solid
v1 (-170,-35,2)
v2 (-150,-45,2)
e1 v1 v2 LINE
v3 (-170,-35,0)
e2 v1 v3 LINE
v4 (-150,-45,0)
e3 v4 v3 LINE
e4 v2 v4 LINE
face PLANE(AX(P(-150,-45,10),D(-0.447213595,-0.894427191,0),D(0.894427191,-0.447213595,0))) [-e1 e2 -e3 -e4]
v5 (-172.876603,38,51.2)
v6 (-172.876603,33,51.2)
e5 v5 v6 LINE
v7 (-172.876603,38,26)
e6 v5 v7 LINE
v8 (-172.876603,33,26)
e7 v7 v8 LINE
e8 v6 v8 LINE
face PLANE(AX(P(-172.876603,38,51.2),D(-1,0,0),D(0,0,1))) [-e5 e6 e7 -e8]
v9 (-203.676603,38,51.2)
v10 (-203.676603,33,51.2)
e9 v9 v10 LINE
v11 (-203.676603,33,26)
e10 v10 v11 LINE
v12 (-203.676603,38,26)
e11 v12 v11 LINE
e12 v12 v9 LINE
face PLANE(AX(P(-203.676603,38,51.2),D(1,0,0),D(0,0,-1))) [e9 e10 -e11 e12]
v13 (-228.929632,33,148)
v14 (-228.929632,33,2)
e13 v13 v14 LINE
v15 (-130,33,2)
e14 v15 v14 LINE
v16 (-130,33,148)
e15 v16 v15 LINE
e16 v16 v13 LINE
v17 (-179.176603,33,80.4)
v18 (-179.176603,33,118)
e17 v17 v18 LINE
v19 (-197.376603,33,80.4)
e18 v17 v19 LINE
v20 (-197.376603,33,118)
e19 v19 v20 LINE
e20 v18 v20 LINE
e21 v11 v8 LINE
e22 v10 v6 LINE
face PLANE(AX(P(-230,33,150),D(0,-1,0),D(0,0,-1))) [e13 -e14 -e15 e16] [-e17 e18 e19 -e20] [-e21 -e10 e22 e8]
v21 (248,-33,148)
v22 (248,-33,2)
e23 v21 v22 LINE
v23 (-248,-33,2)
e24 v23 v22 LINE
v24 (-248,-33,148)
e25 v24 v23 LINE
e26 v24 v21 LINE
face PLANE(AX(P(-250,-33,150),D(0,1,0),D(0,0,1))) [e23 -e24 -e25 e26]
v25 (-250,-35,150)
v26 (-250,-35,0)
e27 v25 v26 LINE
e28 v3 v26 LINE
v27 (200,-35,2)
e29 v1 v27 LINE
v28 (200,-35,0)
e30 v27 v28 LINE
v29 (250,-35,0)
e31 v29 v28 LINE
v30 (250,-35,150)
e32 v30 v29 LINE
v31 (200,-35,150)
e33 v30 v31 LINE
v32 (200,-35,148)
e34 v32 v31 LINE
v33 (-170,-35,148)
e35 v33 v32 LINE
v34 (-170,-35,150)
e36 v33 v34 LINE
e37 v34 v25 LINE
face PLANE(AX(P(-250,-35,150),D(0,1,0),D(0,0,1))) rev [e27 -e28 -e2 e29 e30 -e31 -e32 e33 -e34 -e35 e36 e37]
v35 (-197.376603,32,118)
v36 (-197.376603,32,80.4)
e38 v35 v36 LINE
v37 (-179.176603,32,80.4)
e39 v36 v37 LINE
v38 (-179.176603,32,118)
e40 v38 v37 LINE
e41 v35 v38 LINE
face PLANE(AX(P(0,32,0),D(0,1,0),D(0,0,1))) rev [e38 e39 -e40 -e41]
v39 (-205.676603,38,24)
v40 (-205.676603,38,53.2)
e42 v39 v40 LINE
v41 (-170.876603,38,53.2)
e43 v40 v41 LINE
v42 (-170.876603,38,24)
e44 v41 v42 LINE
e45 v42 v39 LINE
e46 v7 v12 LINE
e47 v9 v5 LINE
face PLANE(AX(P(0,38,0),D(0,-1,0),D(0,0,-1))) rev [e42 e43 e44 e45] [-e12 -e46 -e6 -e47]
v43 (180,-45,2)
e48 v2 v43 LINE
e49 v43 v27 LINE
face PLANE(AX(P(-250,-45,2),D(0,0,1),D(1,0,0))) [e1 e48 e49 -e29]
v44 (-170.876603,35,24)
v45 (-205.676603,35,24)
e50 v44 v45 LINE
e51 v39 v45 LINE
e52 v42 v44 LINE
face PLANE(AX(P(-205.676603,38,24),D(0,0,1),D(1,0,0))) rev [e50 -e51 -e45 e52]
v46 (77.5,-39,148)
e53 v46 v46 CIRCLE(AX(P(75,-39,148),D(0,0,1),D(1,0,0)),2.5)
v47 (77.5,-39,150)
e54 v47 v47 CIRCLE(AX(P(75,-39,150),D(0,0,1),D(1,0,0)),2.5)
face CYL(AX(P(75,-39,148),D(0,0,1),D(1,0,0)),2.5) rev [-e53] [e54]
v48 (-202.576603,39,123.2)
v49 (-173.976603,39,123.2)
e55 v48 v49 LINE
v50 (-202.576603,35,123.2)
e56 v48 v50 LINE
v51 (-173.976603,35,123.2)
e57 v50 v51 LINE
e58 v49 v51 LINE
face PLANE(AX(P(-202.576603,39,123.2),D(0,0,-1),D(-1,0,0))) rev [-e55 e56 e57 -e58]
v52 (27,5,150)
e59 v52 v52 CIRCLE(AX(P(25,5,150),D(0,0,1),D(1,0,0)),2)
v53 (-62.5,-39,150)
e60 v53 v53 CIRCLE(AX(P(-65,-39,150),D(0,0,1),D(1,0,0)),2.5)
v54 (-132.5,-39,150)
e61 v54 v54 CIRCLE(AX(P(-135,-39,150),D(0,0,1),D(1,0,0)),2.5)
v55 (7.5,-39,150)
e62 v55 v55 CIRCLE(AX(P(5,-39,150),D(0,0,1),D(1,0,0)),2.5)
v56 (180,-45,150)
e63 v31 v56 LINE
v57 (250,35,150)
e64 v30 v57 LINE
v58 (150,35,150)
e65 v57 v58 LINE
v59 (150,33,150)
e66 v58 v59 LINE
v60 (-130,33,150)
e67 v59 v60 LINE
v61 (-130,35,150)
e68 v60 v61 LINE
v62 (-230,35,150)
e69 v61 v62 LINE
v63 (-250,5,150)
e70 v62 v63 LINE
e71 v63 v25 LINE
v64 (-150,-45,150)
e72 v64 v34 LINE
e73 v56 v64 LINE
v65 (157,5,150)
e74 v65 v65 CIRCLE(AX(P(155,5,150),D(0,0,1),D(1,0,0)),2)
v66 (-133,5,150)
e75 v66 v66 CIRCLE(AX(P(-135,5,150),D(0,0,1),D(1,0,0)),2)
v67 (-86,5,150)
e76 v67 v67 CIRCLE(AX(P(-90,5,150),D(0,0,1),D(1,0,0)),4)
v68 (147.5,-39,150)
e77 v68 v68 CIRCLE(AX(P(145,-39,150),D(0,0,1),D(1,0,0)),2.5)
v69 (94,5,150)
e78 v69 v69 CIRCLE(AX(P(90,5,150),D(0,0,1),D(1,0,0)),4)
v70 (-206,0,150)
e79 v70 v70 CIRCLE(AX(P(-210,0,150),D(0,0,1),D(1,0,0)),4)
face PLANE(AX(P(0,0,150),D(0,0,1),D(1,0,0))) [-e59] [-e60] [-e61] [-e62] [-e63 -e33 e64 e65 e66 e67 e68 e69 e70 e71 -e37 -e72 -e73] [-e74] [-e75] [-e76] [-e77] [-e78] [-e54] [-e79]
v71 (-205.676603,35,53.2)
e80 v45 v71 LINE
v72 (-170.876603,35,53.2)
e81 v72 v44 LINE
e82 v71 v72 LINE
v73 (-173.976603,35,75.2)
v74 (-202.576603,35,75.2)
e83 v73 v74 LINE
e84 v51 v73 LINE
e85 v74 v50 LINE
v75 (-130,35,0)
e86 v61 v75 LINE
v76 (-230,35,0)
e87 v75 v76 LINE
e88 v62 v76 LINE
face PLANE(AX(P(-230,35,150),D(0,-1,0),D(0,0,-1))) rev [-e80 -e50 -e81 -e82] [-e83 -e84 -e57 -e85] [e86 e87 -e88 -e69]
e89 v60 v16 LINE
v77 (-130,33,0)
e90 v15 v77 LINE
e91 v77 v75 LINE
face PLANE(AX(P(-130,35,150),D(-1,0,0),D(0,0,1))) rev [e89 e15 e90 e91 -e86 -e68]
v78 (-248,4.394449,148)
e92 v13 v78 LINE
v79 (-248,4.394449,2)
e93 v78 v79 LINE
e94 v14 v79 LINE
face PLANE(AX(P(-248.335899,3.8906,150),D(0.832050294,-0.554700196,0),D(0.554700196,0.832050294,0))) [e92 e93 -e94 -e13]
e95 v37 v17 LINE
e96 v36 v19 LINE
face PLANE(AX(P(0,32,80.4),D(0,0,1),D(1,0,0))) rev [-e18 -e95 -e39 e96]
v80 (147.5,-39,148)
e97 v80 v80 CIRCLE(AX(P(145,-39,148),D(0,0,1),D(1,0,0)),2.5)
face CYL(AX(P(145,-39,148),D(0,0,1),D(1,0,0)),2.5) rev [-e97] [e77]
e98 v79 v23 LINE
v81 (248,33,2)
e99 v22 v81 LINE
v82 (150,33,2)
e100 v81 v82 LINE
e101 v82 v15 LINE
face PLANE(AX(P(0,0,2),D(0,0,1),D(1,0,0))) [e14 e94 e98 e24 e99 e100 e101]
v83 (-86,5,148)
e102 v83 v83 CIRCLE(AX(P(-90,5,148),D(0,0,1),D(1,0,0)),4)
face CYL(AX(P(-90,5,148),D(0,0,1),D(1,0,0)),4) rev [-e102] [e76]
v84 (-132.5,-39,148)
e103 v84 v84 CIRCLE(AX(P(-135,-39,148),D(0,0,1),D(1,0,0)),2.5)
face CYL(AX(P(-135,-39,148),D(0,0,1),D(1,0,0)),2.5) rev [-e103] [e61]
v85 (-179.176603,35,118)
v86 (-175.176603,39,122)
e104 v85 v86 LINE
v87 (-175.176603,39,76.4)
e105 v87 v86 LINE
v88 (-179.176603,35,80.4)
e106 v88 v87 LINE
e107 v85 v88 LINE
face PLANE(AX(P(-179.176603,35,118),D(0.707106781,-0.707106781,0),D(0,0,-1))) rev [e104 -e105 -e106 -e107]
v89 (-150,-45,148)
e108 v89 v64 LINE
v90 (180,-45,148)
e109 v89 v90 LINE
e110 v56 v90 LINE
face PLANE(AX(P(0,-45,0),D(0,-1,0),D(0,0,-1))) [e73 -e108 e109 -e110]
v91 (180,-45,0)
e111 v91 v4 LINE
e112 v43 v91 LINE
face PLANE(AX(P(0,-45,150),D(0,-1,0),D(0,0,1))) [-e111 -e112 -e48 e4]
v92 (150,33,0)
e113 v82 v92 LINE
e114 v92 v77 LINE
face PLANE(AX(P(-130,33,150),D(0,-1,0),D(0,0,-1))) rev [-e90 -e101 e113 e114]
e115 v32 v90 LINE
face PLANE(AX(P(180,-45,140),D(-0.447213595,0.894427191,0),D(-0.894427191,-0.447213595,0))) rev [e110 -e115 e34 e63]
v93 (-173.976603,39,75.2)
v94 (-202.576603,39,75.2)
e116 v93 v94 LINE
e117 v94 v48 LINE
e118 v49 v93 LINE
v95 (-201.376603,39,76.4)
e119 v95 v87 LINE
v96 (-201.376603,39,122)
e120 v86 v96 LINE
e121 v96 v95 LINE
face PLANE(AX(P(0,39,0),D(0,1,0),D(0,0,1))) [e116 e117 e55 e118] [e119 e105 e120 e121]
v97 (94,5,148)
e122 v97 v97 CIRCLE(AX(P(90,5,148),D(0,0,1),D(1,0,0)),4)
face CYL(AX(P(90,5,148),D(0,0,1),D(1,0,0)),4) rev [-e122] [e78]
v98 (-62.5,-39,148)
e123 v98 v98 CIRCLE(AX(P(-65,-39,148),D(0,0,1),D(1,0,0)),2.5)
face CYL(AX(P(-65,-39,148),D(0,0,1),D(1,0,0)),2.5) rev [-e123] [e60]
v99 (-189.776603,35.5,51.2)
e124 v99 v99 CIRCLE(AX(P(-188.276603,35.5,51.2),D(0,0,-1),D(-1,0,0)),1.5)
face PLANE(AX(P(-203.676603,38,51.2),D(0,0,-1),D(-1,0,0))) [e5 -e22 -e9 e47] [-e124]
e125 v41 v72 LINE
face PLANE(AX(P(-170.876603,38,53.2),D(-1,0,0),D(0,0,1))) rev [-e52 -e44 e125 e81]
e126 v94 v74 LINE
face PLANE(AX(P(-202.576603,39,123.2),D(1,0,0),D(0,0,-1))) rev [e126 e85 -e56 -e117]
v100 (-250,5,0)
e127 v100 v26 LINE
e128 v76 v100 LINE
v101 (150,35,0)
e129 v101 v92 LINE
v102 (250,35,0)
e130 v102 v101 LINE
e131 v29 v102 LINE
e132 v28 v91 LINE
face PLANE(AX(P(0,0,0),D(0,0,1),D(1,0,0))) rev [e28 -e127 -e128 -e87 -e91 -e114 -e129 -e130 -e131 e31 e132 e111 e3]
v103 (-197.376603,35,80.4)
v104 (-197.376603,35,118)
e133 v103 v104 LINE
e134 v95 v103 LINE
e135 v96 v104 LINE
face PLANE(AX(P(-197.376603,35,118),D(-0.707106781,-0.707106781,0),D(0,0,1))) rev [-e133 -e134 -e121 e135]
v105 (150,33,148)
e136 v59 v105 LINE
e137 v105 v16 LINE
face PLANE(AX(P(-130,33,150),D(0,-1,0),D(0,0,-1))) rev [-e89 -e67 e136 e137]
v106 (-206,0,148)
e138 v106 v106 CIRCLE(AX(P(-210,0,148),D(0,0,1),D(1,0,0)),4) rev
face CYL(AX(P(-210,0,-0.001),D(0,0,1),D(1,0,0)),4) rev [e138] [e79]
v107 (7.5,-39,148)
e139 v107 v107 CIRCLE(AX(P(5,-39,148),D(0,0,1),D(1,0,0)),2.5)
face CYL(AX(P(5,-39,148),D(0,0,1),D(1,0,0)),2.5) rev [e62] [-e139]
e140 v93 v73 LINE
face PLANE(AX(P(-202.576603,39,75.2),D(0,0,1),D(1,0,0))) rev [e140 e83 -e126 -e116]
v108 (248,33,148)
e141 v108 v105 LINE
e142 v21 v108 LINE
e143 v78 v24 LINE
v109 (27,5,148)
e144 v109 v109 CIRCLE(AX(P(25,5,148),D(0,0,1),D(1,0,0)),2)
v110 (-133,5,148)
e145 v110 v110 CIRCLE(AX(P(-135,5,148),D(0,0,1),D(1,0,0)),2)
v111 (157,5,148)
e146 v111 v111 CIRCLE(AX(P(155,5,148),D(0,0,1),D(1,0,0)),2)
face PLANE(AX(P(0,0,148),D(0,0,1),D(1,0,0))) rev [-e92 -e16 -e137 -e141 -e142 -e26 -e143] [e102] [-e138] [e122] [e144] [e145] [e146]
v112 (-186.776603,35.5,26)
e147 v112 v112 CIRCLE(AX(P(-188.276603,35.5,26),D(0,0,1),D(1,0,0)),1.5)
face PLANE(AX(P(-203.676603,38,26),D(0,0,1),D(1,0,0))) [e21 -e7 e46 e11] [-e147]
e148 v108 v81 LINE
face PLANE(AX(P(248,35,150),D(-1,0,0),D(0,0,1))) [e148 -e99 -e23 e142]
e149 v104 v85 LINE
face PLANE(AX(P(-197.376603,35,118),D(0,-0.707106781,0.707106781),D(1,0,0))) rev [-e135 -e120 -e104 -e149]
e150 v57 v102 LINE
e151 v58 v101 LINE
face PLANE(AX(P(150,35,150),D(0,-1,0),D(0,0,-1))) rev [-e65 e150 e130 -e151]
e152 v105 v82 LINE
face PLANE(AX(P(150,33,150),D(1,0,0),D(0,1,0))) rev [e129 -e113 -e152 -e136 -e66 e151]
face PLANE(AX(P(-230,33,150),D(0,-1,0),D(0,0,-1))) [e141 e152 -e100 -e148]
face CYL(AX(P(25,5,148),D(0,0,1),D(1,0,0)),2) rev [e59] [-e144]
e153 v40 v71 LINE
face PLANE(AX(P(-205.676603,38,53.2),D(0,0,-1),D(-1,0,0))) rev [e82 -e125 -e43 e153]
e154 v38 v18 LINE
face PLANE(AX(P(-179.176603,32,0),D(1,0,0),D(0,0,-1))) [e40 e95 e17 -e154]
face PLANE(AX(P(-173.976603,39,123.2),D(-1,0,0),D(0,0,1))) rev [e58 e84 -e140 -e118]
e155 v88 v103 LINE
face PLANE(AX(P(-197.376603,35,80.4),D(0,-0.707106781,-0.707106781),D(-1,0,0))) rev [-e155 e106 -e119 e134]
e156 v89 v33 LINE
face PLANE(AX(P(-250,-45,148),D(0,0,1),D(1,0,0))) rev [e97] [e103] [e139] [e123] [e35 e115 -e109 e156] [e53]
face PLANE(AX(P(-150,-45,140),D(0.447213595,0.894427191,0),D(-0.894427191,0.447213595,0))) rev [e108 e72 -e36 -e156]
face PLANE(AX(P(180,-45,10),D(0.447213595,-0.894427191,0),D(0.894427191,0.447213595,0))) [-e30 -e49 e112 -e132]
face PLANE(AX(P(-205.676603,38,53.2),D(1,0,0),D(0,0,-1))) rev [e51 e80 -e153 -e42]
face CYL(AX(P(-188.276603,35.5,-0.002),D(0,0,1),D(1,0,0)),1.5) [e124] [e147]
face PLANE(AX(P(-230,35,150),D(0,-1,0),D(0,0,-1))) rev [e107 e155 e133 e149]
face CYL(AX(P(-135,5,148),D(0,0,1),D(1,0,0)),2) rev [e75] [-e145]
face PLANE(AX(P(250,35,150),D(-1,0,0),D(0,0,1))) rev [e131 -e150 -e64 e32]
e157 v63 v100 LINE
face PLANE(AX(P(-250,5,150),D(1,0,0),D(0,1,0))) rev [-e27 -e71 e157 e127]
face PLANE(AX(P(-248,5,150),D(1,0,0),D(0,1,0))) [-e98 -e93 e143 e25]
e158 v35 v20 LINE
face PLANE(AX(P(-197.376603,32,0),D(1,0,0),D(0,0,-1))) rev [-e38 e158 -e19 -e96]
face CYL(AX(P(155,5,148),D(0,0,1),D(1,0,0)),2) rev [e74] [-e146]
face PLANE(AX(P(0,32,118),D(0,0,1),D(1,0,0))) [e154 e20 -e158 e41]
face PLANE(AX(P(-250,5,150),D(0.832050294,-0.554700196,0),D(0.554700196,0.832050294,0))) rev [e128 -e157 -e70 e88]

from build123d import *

# Parameters (mm, degrees)
EXTRUDE_1_DEPTH        = 150
SHELL_START            = 2
SHELL_1_DEPTH          = 146
SKETCH_3_W             = 500
SKETCH_3_H             = 2
EXTRUDE_2_DEPTH        = 10
CUT_EXTRUDE_1_DEPTH    = 10
SKETCH_5_R             = 2.5
CUT_EXTRUDE_2_DEPTH    = 2
PATTERN_LINEAR_1_COUNT = 5
PATTERN_LINEAR_1_PITCH = 70
SKETCH_6_R             = 2
CUT_EXTRUDE_3_DEPTH    = 2
SKETCH_7_R             = 4
CUT_EXTRUDE_4_DEPTH    = 2
CUT_EXTRUDE_5_REACH    = 297
SKETCH_8_R             = 4
SKETCH_9_W             = 28.6
SKETCH_9_H             = 48
SKETCH_9_W_2           = 18.2
SKETCH_9_H_2           = 37.6
EXTRUDE_3_DEPTH        = 4
CHAMFER_1_SIZE         = 4
SKETCH_11_W            = 34.8
SKETCH_11_H            = 29.2
SKETCH_11_W_2          = 30.8
SKETCH_11_H_2          = 25.2
EXTRUDE_4_DEPTH        = 3
CUT_EXTRUDE_6_REACH    = 304.324
SKETCH_11_2_W          = 30.8
SKETCH_11_2_H          = 25.2
EXTRUDE_5_REACH        = 274.555
SKETCH_14_R            = 1.5
SKETCH_9_2_W           = 18.2
SKETCH_9_2_H           = 37.6
EXTRUDE_6_DEPTH        = 3


# Read off the part's stored shape, not the designer's step: 抽壳1
with BuildPart() as part:
    # 草图1 → 凸台-拉伸1 (new body)
    with BuildSketch(Plane.XY):
        Polygon((-250, 5), (-230, 35), (-130, 35), (-130, 33), (150, 33), (150, 35), (250, 35), (250, -35), (-250, -35), align=None)
    extrude(amount=EXTRUDE_1_DEPTH)

    # 抽壳1 outline → 抽壳1 (cut)
    with BuildSketch(Plane.XY.offset(SHELL_START)):
        Polygon((248, 33), (-228.929632483, 33), (-248, 4.394448725), (-248, -33), (248, -33), align=None)
    extrude(amount=SHELL_1_DEPTH, mode=Mode.SUBTRACT)

    # 草图3 → 凸台-拉伸2 (add)
    with BuildSketch(Plane.XZ.offset(35)):
        with Locations((0, 149)):
            Rectangle(SKETCH_3_W, SKETCH_3_H)
    extrude_2 = extrude(amount=EXTRUDE_2_DEPTH)

    # 草图4 → 切除-拉伸1 (cut)
    with BuildSketch(Plane.XY.offset(150)):
        Polygon((-150, -45), (-170, -35), (-250, -35), (-250, -45), align=None)
        Polygon((250, -35), (200, -35), (180, -45), (250, -45), align=None)
    cut_extrude_1 = extrude(amount=-CUT_EXTRUDE_1_DEPTH, mode=Mode.SUBTRACT)

    # 镜向1: 凸台-拉伸2, 切除-拉伸1 across plane
    add(extrude_2.mirror(Plane(origin=(0, 0, 75), x_dir=(1, 0, 0), z_dir=(0, 0, -1))))
    add(cut_extrude_1.mirror(Plane(origin=(0, 0, 75), x_dir=(1, 0, 0), z_dir=(0, 0, -1))), mode=Mode.SUBTRACT)

    # 草图5 → 切除-拉伸2 (cut)
    with BuildSketch(Plane.XY.offset(150)):
        with Locations((-135, -39)):
            Circle(SKETCH_5_R)
    cut_extrude_2 = extrude(amount=-CUT_EXTRUDE_2_DEPTH, mode=Mode.SUBTRACT)

    # 阵列(线性)1: 切除-拉伸2 ×5
    with Locations(*[(i * PATTERN_LINEAR_1_PITCH, 0, 0) for i in range(1, PATTERN_LINEAR_1_COUNT)]):
        add(cut_extrude_2, mode=Mode.SUBTRACT)

    # 草图6 → 切除-拉伸3 (cut)
    with BuildSketch(Plane.XY.offset(150)):
        with Locations((-135, 5)):
            Circle(SKETCH_6_R)
        with Locations((25, 5)):
            Circle(SKETCH_6_R)
        with Locations((155, 5)):
            Circle(SKETCH_6_R)
    extrude(amount=-CUT_EXTRUDE_3_DEPTH, mode=Mode.SUBTRACT)

    # 草图7 → 切除-拉伸4 (cut)
    with BuildSketch(Plane.XY.offset(150)):
        with Locations((-90, 5)):
            Circle(SKETCH_7_R)
        with Locations((90, 5)):
            Circle(SKETCH_7_R)
    extrude(amount=-CUT_EXTRUDE_4_DEPTH, mode=Mode.SUBTRACT)

    # 草图8 → 切除-拉伸5 (cut, up to next)
    with BuildSketch(Plane.XY.offset(150), mode=Mode.PRIVATE) as cut_extrude_5_sk1:
        with Locations((-210, 0)):
            Circle(SKETCH_8_R)
    cut_extrude_5_tool1 = extrude(cut_extrude_5_sk1.sketch, amount=-CUT_EXTRUDE_5_REACH, mode=Mode.PRIVATE) & part.part
    add(cut_extrude_5_tool1.solids().sort_by_distance((-210, 0, 150))[0], mode=Mode.SUBTRACT)

    # 草图9 → 凸台-拉伸3 (add)
    with BuildSketch(Plane(origin=(0, 35, 0), x_dir=(1, 0, 0), z_dir=(0, 1, 0))):
        with Locations((-188.276603419, -99.2)):
            Rectangle(SKETCH_9_W, SKETCH_9_H)
        with Locations((-188.276603419, -99.2)):
            Rectangle(SKETCH_9_W_2, SKETCH_9_H_2, mode=Mode.SUBTRACT)
    extrude(amount=EXTRUDE_3_DEPTH)

    # 倒角1
    chamfer_1_edges = [part.edges().sort_by_distance(p)[0] for p in [
        (-188.276603419, 39, 80.4),
        (-179.176603419, 39, 99.2),
        (-188.276603419, 39, 118),
        (-197.376603419, 39, 99.2),
    ]]
    chamfer(chamfer_1_edges, length=CHAMFER_1_SIZE - 0.0001)  # a hair under: the kernel refuses the full size

    # 草图11 → 凸台-拉伸4 (add)
    with BuildSketch(Plane(origin=(0, 35, 0), x_dir=(1, 0, 0), z_dir=(0, 1, 0))):
        with Locations((-188.276603419, -38.6)):
            Rectangle(SKETCH_11_W, SKETCH_11_H)
        with Locations((-188.276603419, -38.6)):
            Rectangle(SKETCH_11_W_2, SKETCH_11_H_2, mode=Mode.SUBTRACT)
    extrude(amount=EXTRUDE_4_DEPTH)

    # 草图11<2> → 切除-拉伸6 (cut, up to next)
    with BuildSketch(Plane(origin=(0, 35, 0), x_dir=(1, 0, 0), z_dir=(0, 1, 0)), mode=Mode.PRIVATE) as cut_extrude_6_sk1:
        with Locations((-188.276603419, -38.6)):
            Rectangle(SKETCH_11_2_W, SKETCH_11_2_H)
    cut_extrude_6_tool1 = extrude(cut_extrude_6_sk1.sketch, amount=-CUT_EXTRUDE_6_REACH, mode=Mode.PRIVATE) & part.part
    add(cut_extrude_6_tool1.solids().sort_by_distance((-188.276603, 35, 38.6))[0], mode=Mode.SUBTRACT)

    # 草图14 → 凸台-拉伸5 (add, up to next)
    with BuildSketch(Plane(origin=(0, 0, 51.2), x_dir=(-1, 0, 0), z_dir=(0, 0, -1)), mode=Mode.PRIVATE) as extrude_5_sk1:
        with Locations(Location((188.276603419, 35.5, 0), (0, 0, 180))):
            Circle(SKETCH_14_R)
    extrude_5_tool1 = extrude(extrude_5_sk1.sketch, amount=EXTRUDE_5_REACH, mode=Mode.PRIVATE) - part.part
    add(extrude_5_tool1.solids().sort_by_distance((-188.276603, 35.5, 51.2))[0])

    # 草图9<2> → 凸台-拉伸6 (add)
    with BuildSketch(Plane(origin=(0, 35, 0), x_dir=(1, 0, 0), z_dir=(0, 1, 0))):
        with Locations((-188.276603419, -99.2)):
            Rectangle(SKETCH_9_2_W, SKETCH_9_2_H)
    extrude(amount=-EXTRUDE_6_DEPTH)


solid = part.part
